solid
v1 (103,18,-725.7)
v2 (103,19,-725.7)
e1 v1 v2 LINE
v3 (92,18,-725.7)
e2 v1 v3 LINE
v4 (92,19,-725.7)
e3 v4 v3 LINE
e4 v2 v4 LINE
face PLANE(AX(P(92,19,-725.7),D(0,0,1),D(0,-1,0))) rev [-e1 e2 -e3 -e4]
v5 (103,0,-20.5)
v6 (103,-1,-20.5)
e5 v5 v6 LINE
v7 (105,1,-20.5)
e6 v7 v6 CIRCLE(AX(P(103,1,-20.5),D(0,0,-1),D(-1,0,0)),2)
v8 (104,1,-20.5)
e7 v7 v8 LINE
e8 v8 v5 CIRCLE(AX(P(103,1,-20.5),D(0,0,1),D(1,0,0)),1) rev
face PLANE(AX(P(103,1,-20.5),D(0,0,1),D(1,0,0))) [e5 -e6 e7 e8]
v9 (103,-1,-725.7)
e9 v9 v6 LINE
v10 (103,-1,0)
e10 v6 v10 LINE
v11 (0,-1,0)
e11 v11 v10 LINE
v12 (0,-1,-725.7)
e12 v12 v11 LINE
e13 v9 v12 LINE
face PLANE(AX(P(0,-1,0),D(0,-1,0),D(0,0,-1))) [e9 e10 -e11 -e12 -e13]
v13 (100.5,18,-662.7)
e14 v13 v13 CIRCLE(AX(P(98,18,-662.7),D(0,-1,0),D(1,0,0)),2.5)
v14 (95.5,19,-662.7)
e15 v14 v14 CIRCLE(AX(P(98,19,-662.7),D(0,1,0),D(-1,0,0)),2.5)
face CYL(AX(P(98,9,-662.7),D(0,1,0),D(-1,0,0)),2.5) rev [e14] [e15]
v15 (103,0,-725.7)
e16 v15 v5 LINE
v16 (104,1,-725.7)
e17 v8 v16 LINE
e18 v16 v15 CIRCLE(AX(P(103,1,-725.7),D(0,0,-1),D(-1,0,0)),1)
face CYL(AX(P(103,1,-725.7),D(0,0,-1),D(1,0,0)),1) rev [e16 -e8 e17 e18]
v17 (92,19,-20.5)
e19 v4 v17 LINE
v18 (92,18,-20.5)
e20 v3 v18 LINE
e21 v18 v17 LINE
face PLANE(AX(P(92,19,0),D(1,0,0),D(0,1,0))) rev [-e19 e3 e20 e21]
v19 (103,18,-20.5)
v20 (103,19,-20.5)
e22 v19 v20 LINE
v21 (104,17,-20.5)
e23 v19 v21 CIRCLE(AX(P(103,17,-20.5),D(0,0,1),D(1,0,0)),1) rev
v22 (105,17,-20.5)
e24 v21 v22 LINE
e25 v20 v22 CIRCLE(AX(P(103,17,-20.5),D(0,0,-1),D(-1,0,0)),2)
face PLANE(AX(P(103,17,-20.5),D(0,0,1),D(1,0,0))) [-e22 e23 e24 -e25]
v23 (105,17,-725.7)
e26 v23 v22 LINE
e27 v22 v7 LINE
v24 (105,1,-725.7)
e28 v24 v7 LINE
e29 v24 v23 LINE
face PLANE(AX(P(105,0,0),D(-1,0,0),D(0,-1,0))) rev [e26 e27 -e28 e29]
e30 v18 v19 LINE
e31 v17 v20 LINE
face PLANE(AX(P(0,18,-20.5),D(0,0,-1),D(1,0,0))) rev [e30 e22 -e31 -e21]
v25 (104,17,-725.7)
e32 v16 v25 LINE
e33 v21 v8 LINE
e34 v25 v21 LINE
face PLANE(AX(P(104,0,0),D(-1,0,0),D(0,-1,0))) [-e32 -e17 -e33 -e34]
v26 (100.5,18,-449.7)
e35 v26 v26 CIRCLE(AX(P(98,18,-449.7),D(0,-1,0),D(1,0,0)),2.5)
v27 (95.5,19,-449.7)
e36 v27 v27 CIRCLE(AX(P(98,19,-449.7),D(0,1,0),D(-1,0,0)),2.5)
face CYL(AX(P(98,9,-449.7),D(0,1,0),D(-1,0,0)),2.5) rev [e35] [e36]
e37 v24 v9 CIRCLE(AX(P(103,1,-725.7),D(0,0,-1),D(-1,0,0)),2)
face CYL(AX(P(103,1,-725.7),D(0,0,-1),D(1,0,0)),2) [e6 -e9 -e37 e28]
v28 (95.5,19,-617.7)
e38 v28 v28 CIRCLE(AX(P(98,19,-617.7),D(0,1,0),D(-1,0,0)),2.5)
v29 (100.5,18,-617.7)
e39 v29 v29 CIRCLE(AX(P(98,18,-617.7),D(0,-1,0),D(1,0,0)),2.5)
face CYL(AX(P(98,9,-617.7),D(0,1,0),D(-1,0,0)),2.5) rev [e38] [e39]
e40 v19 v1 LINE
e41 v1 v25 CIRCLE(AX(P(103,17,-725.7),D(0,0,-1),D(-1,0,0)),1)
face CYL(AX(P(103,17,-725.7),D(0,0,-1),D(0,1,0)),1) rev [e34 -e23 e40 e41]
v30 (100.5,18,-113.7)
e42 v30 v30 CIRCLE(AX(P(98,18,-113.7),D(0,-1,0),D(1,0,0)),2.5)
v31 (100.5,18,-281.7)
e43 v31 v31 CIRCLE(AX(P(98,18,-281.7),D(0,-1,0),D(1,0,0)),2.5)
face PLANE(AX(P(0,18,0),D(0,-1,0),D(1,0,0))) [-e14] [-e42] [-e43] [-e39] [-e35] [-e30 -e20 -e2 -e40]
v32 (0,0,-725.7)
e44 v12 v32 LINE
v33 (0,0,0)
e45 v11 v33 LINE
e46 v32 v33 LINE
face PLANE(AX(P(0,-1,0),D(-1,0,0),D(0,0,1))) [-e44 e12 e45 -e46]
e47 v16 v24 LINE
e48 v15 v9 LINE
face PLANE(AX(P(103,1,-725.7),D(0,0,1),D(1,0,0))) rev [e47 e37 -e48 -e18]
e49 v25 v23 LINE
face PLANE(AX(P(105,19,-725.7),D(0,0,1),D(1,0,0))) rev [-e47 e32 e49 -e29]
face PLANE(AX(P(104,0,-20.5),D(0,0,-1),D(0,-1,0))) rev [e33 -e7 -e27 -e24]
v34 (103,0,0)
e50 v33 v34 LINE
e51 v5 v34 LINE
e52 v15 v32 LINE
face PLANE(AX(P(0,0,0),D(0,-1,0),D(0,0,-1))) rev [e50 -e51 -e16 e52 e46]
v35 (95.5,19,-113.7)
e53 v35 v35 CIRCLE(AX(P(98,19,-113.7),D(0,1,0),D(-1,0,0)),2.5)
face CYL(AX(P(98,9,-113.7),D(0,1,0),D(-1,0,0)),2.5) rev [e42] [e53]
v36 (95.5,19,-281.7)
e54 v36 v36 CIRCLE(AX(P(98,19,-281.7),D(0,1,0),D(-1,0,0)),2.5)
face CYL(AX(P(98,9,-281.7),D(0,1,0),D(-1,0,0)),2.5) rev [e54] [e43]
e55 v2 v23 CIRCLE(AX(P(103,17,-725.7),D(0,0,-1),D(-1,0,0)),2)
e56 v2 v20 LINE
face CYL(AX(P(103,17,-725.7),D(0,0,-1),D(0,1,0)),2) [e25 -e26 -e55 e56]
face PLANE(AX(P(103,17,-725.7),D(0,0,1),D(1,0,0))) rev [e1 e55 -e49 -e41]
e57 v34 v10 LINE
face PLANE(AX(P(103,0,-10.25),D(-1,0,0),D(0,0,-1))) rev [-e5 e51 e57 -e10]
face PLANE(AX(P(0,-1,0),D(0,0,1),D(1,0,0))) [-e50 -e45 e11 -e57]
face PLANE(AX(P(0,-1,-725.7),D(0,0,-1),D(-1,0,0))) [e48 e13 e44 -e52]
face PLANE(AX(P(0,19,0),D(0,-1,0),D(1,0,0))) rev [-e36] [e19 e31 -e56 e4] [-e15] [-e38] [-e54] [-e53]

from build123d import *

# Parameters (mm, degrees)
SKETCH1_W                    = 105
SKETCH1_H                    = 725.7
BASE_FLANGE1_DEPTH           = 1
EDGE_FLANGE1_STRIP_W         = 6
EDGE_FLANGE1_STRIP_H         = 1
EDGE_FLANGE1_STRIP_CUT_DEPTH = 725.7
EDGE_FLANGE1_DEPTH           = 725.7
EDGE_FLANGE2_STRIP_W         = 6
EDGE_FLANGE2_STRIP_H         = 1
EDGE_FLANGE2_STRIP_CUT_DEPTH = 725.7
EDGE_FLANGE2_DEPTH           = 725.7
SKETCH19_R                   = 2.5
CUT_EXTRUDE2_DEPTH           = 10
CUT_EXTRUDE3_START           = -20.5
CUT_EXTRUDE3_DEPTH           = 20.5


# Read off the part's stored shape, not the designer's step: Cut-Extrude3
# Sheet-metal steps are written as plain solids
with BuildPart() as part:
    # Sketch1 → Base-Flange1 (new body)
    with BuildSketch(Plane(origin=(0, 0, 0), x_dir=(1, 0, 0), z_dir=(0, 1, 0))):
        with Locations((52.5, 362.85)):
            Rectangle(SKETCH1_W, SKETCH1_H)
    extrude(amount=-BASE_FLANGE1_DEPTH)

    # Edge-Flange1 strip (across the edge) → Edge-Flange1 strip cut (cut)
    with BuildSketch(Plane(origin=(105, 0, 0), x_dir=(-1, 0, 0), z_dir=(0, 0, -1))):
        with Locations((-1, -0.5)):
            Rectangle(EDGE_FLANGE1_STRIP_W, EDGE_FLANGE1_STRIP_H)
    extrude(amount=EDGE_FLANGE1_STRIP_CUT_DEPTH, mode=Mode.SUBTRACT)

    # Edge-Flange1 section (across the edge) → Edge-Flange1 (add)
    with BuildSketch(Plane(origin=(105, 0, 0), x_dir=(-1, 0, 0), z_dir=(0, 0, -1))):
        with BuildLine():
            Line((0, 1), (0, 19))
            Line((0, 19), (1, 19))
            Line((1, 19), (1, 1))
            ThreePointArc((1, 1), (1.292893219, 0.292893219), (2, 0))
            Line((2, 0), (2, -1))
            ThreePointArc((2, -1), (0.585786438, -0.414213562), (0, 1))
        make_face()
    extrude(amount=EDGE_FLANGE1_DEPTH)

    # Edge-Flange2 strip (across the edge) → Edge-Flange2 strip cut (cut)
    with BuildSketch(Plane(origin=(104, 19, 0), x_dir=(0, -1, 0), z_dir=(0, 0, -1))):
        with Locations((-1, -0.5)):
            Rectangle(EDGE_FLANGE2_STRIP_W, EDGE_FLANGE2_STRIP_H)
    extrude(amount=EDGE_FLANGE2_STRIP_CUT_DEPTH, mode=Mode.SUBTRACT)

    # Edge-Flange2 section (across the edge) → Edge-Flange2 (add)
    with BuildSketch(Plane(origin=(104, 19, 0), x_dir=(0, -1, 0), z_dir=(0, 0, -1))):
        with BuildLine():
            Line((0, 1), (0, 12))
            Line((0, 12), (1, 12))
            Line((1, 12), (1, 1))
            ThreePointArc((1, 1), (1.292893219, 0.292893219), (2, 0))
            Line((2, 0), (2, -1))
            ThreePointArc((2, -1), (0.585786438, -0.414213562), (0, 1))
        make_face()
    extrude(amount=EDGE_FLANGE2_DEPTH)

    # Sketch19 → Cut-Extrude2 (cut)
    with BuildSketch(Plane(origin=(0, 19, 0), x_dir=(1, 0, 0), z_dir=(0, 1, 0))):
        with Locations(Location((98, 662.7, 0), (0, 0, 180))):
            Circle(SKETCH19_R)
        with Locations(Location((98, 617.7, 0), (0, 0, 180))):
            Circle(SKETCH19_R)
        with Locations(Location((98, 449.7, 0), (0, 0, 180))):
            Circle(SKETCH19_R)
        with Locations(Location((98, 281.7, 0), (0, 0, 180))):
            Circle(SKETCH19_R)
        with Locations(Location((98, 113.7, 0), (0, 0, 180))):
            Circle(SKETCH19_R)
        with Locations((98, -54.3)):
            Circle(SKETCH19_R)
    extrude(amount=-CUT_EXTRUDE2_DEPTH, mode=Mode.SUBTRACT)

    # Cut-Extrude3 outline → Cut-Extrude3 (cut)
    with BuildSketch(Plane.XY.offset(CUT_EXTRUDE3_START)):
        with BuildLine():
            ThreePointArc((104, 1), (103.707106781, 0.292893219), (103, 0))
            Line((103, 0), (103, -1))
            ThreePointArc((103, -1), (104.414213562, -0.414213562), (105, 1))
            Line((105, 1), (105, 17))
            ThreePointArc((105, 17), (104.414213562, 18.414213562), (103, 19))
            Line((103, 19), (92, 19))
            Line((92, 19), (92, 18))
            Line((92, 18), (103, 18))
            ThreePointArc((103, 18), (103.707106781, 17.707106781), (104, 17))
            Line((104, 17), (104, 1))
        make_face()
    extrude(amount=CUT_EXTRUDE3_DEPTH, mode=Mode.SUBTRACT)


solid = part.part
